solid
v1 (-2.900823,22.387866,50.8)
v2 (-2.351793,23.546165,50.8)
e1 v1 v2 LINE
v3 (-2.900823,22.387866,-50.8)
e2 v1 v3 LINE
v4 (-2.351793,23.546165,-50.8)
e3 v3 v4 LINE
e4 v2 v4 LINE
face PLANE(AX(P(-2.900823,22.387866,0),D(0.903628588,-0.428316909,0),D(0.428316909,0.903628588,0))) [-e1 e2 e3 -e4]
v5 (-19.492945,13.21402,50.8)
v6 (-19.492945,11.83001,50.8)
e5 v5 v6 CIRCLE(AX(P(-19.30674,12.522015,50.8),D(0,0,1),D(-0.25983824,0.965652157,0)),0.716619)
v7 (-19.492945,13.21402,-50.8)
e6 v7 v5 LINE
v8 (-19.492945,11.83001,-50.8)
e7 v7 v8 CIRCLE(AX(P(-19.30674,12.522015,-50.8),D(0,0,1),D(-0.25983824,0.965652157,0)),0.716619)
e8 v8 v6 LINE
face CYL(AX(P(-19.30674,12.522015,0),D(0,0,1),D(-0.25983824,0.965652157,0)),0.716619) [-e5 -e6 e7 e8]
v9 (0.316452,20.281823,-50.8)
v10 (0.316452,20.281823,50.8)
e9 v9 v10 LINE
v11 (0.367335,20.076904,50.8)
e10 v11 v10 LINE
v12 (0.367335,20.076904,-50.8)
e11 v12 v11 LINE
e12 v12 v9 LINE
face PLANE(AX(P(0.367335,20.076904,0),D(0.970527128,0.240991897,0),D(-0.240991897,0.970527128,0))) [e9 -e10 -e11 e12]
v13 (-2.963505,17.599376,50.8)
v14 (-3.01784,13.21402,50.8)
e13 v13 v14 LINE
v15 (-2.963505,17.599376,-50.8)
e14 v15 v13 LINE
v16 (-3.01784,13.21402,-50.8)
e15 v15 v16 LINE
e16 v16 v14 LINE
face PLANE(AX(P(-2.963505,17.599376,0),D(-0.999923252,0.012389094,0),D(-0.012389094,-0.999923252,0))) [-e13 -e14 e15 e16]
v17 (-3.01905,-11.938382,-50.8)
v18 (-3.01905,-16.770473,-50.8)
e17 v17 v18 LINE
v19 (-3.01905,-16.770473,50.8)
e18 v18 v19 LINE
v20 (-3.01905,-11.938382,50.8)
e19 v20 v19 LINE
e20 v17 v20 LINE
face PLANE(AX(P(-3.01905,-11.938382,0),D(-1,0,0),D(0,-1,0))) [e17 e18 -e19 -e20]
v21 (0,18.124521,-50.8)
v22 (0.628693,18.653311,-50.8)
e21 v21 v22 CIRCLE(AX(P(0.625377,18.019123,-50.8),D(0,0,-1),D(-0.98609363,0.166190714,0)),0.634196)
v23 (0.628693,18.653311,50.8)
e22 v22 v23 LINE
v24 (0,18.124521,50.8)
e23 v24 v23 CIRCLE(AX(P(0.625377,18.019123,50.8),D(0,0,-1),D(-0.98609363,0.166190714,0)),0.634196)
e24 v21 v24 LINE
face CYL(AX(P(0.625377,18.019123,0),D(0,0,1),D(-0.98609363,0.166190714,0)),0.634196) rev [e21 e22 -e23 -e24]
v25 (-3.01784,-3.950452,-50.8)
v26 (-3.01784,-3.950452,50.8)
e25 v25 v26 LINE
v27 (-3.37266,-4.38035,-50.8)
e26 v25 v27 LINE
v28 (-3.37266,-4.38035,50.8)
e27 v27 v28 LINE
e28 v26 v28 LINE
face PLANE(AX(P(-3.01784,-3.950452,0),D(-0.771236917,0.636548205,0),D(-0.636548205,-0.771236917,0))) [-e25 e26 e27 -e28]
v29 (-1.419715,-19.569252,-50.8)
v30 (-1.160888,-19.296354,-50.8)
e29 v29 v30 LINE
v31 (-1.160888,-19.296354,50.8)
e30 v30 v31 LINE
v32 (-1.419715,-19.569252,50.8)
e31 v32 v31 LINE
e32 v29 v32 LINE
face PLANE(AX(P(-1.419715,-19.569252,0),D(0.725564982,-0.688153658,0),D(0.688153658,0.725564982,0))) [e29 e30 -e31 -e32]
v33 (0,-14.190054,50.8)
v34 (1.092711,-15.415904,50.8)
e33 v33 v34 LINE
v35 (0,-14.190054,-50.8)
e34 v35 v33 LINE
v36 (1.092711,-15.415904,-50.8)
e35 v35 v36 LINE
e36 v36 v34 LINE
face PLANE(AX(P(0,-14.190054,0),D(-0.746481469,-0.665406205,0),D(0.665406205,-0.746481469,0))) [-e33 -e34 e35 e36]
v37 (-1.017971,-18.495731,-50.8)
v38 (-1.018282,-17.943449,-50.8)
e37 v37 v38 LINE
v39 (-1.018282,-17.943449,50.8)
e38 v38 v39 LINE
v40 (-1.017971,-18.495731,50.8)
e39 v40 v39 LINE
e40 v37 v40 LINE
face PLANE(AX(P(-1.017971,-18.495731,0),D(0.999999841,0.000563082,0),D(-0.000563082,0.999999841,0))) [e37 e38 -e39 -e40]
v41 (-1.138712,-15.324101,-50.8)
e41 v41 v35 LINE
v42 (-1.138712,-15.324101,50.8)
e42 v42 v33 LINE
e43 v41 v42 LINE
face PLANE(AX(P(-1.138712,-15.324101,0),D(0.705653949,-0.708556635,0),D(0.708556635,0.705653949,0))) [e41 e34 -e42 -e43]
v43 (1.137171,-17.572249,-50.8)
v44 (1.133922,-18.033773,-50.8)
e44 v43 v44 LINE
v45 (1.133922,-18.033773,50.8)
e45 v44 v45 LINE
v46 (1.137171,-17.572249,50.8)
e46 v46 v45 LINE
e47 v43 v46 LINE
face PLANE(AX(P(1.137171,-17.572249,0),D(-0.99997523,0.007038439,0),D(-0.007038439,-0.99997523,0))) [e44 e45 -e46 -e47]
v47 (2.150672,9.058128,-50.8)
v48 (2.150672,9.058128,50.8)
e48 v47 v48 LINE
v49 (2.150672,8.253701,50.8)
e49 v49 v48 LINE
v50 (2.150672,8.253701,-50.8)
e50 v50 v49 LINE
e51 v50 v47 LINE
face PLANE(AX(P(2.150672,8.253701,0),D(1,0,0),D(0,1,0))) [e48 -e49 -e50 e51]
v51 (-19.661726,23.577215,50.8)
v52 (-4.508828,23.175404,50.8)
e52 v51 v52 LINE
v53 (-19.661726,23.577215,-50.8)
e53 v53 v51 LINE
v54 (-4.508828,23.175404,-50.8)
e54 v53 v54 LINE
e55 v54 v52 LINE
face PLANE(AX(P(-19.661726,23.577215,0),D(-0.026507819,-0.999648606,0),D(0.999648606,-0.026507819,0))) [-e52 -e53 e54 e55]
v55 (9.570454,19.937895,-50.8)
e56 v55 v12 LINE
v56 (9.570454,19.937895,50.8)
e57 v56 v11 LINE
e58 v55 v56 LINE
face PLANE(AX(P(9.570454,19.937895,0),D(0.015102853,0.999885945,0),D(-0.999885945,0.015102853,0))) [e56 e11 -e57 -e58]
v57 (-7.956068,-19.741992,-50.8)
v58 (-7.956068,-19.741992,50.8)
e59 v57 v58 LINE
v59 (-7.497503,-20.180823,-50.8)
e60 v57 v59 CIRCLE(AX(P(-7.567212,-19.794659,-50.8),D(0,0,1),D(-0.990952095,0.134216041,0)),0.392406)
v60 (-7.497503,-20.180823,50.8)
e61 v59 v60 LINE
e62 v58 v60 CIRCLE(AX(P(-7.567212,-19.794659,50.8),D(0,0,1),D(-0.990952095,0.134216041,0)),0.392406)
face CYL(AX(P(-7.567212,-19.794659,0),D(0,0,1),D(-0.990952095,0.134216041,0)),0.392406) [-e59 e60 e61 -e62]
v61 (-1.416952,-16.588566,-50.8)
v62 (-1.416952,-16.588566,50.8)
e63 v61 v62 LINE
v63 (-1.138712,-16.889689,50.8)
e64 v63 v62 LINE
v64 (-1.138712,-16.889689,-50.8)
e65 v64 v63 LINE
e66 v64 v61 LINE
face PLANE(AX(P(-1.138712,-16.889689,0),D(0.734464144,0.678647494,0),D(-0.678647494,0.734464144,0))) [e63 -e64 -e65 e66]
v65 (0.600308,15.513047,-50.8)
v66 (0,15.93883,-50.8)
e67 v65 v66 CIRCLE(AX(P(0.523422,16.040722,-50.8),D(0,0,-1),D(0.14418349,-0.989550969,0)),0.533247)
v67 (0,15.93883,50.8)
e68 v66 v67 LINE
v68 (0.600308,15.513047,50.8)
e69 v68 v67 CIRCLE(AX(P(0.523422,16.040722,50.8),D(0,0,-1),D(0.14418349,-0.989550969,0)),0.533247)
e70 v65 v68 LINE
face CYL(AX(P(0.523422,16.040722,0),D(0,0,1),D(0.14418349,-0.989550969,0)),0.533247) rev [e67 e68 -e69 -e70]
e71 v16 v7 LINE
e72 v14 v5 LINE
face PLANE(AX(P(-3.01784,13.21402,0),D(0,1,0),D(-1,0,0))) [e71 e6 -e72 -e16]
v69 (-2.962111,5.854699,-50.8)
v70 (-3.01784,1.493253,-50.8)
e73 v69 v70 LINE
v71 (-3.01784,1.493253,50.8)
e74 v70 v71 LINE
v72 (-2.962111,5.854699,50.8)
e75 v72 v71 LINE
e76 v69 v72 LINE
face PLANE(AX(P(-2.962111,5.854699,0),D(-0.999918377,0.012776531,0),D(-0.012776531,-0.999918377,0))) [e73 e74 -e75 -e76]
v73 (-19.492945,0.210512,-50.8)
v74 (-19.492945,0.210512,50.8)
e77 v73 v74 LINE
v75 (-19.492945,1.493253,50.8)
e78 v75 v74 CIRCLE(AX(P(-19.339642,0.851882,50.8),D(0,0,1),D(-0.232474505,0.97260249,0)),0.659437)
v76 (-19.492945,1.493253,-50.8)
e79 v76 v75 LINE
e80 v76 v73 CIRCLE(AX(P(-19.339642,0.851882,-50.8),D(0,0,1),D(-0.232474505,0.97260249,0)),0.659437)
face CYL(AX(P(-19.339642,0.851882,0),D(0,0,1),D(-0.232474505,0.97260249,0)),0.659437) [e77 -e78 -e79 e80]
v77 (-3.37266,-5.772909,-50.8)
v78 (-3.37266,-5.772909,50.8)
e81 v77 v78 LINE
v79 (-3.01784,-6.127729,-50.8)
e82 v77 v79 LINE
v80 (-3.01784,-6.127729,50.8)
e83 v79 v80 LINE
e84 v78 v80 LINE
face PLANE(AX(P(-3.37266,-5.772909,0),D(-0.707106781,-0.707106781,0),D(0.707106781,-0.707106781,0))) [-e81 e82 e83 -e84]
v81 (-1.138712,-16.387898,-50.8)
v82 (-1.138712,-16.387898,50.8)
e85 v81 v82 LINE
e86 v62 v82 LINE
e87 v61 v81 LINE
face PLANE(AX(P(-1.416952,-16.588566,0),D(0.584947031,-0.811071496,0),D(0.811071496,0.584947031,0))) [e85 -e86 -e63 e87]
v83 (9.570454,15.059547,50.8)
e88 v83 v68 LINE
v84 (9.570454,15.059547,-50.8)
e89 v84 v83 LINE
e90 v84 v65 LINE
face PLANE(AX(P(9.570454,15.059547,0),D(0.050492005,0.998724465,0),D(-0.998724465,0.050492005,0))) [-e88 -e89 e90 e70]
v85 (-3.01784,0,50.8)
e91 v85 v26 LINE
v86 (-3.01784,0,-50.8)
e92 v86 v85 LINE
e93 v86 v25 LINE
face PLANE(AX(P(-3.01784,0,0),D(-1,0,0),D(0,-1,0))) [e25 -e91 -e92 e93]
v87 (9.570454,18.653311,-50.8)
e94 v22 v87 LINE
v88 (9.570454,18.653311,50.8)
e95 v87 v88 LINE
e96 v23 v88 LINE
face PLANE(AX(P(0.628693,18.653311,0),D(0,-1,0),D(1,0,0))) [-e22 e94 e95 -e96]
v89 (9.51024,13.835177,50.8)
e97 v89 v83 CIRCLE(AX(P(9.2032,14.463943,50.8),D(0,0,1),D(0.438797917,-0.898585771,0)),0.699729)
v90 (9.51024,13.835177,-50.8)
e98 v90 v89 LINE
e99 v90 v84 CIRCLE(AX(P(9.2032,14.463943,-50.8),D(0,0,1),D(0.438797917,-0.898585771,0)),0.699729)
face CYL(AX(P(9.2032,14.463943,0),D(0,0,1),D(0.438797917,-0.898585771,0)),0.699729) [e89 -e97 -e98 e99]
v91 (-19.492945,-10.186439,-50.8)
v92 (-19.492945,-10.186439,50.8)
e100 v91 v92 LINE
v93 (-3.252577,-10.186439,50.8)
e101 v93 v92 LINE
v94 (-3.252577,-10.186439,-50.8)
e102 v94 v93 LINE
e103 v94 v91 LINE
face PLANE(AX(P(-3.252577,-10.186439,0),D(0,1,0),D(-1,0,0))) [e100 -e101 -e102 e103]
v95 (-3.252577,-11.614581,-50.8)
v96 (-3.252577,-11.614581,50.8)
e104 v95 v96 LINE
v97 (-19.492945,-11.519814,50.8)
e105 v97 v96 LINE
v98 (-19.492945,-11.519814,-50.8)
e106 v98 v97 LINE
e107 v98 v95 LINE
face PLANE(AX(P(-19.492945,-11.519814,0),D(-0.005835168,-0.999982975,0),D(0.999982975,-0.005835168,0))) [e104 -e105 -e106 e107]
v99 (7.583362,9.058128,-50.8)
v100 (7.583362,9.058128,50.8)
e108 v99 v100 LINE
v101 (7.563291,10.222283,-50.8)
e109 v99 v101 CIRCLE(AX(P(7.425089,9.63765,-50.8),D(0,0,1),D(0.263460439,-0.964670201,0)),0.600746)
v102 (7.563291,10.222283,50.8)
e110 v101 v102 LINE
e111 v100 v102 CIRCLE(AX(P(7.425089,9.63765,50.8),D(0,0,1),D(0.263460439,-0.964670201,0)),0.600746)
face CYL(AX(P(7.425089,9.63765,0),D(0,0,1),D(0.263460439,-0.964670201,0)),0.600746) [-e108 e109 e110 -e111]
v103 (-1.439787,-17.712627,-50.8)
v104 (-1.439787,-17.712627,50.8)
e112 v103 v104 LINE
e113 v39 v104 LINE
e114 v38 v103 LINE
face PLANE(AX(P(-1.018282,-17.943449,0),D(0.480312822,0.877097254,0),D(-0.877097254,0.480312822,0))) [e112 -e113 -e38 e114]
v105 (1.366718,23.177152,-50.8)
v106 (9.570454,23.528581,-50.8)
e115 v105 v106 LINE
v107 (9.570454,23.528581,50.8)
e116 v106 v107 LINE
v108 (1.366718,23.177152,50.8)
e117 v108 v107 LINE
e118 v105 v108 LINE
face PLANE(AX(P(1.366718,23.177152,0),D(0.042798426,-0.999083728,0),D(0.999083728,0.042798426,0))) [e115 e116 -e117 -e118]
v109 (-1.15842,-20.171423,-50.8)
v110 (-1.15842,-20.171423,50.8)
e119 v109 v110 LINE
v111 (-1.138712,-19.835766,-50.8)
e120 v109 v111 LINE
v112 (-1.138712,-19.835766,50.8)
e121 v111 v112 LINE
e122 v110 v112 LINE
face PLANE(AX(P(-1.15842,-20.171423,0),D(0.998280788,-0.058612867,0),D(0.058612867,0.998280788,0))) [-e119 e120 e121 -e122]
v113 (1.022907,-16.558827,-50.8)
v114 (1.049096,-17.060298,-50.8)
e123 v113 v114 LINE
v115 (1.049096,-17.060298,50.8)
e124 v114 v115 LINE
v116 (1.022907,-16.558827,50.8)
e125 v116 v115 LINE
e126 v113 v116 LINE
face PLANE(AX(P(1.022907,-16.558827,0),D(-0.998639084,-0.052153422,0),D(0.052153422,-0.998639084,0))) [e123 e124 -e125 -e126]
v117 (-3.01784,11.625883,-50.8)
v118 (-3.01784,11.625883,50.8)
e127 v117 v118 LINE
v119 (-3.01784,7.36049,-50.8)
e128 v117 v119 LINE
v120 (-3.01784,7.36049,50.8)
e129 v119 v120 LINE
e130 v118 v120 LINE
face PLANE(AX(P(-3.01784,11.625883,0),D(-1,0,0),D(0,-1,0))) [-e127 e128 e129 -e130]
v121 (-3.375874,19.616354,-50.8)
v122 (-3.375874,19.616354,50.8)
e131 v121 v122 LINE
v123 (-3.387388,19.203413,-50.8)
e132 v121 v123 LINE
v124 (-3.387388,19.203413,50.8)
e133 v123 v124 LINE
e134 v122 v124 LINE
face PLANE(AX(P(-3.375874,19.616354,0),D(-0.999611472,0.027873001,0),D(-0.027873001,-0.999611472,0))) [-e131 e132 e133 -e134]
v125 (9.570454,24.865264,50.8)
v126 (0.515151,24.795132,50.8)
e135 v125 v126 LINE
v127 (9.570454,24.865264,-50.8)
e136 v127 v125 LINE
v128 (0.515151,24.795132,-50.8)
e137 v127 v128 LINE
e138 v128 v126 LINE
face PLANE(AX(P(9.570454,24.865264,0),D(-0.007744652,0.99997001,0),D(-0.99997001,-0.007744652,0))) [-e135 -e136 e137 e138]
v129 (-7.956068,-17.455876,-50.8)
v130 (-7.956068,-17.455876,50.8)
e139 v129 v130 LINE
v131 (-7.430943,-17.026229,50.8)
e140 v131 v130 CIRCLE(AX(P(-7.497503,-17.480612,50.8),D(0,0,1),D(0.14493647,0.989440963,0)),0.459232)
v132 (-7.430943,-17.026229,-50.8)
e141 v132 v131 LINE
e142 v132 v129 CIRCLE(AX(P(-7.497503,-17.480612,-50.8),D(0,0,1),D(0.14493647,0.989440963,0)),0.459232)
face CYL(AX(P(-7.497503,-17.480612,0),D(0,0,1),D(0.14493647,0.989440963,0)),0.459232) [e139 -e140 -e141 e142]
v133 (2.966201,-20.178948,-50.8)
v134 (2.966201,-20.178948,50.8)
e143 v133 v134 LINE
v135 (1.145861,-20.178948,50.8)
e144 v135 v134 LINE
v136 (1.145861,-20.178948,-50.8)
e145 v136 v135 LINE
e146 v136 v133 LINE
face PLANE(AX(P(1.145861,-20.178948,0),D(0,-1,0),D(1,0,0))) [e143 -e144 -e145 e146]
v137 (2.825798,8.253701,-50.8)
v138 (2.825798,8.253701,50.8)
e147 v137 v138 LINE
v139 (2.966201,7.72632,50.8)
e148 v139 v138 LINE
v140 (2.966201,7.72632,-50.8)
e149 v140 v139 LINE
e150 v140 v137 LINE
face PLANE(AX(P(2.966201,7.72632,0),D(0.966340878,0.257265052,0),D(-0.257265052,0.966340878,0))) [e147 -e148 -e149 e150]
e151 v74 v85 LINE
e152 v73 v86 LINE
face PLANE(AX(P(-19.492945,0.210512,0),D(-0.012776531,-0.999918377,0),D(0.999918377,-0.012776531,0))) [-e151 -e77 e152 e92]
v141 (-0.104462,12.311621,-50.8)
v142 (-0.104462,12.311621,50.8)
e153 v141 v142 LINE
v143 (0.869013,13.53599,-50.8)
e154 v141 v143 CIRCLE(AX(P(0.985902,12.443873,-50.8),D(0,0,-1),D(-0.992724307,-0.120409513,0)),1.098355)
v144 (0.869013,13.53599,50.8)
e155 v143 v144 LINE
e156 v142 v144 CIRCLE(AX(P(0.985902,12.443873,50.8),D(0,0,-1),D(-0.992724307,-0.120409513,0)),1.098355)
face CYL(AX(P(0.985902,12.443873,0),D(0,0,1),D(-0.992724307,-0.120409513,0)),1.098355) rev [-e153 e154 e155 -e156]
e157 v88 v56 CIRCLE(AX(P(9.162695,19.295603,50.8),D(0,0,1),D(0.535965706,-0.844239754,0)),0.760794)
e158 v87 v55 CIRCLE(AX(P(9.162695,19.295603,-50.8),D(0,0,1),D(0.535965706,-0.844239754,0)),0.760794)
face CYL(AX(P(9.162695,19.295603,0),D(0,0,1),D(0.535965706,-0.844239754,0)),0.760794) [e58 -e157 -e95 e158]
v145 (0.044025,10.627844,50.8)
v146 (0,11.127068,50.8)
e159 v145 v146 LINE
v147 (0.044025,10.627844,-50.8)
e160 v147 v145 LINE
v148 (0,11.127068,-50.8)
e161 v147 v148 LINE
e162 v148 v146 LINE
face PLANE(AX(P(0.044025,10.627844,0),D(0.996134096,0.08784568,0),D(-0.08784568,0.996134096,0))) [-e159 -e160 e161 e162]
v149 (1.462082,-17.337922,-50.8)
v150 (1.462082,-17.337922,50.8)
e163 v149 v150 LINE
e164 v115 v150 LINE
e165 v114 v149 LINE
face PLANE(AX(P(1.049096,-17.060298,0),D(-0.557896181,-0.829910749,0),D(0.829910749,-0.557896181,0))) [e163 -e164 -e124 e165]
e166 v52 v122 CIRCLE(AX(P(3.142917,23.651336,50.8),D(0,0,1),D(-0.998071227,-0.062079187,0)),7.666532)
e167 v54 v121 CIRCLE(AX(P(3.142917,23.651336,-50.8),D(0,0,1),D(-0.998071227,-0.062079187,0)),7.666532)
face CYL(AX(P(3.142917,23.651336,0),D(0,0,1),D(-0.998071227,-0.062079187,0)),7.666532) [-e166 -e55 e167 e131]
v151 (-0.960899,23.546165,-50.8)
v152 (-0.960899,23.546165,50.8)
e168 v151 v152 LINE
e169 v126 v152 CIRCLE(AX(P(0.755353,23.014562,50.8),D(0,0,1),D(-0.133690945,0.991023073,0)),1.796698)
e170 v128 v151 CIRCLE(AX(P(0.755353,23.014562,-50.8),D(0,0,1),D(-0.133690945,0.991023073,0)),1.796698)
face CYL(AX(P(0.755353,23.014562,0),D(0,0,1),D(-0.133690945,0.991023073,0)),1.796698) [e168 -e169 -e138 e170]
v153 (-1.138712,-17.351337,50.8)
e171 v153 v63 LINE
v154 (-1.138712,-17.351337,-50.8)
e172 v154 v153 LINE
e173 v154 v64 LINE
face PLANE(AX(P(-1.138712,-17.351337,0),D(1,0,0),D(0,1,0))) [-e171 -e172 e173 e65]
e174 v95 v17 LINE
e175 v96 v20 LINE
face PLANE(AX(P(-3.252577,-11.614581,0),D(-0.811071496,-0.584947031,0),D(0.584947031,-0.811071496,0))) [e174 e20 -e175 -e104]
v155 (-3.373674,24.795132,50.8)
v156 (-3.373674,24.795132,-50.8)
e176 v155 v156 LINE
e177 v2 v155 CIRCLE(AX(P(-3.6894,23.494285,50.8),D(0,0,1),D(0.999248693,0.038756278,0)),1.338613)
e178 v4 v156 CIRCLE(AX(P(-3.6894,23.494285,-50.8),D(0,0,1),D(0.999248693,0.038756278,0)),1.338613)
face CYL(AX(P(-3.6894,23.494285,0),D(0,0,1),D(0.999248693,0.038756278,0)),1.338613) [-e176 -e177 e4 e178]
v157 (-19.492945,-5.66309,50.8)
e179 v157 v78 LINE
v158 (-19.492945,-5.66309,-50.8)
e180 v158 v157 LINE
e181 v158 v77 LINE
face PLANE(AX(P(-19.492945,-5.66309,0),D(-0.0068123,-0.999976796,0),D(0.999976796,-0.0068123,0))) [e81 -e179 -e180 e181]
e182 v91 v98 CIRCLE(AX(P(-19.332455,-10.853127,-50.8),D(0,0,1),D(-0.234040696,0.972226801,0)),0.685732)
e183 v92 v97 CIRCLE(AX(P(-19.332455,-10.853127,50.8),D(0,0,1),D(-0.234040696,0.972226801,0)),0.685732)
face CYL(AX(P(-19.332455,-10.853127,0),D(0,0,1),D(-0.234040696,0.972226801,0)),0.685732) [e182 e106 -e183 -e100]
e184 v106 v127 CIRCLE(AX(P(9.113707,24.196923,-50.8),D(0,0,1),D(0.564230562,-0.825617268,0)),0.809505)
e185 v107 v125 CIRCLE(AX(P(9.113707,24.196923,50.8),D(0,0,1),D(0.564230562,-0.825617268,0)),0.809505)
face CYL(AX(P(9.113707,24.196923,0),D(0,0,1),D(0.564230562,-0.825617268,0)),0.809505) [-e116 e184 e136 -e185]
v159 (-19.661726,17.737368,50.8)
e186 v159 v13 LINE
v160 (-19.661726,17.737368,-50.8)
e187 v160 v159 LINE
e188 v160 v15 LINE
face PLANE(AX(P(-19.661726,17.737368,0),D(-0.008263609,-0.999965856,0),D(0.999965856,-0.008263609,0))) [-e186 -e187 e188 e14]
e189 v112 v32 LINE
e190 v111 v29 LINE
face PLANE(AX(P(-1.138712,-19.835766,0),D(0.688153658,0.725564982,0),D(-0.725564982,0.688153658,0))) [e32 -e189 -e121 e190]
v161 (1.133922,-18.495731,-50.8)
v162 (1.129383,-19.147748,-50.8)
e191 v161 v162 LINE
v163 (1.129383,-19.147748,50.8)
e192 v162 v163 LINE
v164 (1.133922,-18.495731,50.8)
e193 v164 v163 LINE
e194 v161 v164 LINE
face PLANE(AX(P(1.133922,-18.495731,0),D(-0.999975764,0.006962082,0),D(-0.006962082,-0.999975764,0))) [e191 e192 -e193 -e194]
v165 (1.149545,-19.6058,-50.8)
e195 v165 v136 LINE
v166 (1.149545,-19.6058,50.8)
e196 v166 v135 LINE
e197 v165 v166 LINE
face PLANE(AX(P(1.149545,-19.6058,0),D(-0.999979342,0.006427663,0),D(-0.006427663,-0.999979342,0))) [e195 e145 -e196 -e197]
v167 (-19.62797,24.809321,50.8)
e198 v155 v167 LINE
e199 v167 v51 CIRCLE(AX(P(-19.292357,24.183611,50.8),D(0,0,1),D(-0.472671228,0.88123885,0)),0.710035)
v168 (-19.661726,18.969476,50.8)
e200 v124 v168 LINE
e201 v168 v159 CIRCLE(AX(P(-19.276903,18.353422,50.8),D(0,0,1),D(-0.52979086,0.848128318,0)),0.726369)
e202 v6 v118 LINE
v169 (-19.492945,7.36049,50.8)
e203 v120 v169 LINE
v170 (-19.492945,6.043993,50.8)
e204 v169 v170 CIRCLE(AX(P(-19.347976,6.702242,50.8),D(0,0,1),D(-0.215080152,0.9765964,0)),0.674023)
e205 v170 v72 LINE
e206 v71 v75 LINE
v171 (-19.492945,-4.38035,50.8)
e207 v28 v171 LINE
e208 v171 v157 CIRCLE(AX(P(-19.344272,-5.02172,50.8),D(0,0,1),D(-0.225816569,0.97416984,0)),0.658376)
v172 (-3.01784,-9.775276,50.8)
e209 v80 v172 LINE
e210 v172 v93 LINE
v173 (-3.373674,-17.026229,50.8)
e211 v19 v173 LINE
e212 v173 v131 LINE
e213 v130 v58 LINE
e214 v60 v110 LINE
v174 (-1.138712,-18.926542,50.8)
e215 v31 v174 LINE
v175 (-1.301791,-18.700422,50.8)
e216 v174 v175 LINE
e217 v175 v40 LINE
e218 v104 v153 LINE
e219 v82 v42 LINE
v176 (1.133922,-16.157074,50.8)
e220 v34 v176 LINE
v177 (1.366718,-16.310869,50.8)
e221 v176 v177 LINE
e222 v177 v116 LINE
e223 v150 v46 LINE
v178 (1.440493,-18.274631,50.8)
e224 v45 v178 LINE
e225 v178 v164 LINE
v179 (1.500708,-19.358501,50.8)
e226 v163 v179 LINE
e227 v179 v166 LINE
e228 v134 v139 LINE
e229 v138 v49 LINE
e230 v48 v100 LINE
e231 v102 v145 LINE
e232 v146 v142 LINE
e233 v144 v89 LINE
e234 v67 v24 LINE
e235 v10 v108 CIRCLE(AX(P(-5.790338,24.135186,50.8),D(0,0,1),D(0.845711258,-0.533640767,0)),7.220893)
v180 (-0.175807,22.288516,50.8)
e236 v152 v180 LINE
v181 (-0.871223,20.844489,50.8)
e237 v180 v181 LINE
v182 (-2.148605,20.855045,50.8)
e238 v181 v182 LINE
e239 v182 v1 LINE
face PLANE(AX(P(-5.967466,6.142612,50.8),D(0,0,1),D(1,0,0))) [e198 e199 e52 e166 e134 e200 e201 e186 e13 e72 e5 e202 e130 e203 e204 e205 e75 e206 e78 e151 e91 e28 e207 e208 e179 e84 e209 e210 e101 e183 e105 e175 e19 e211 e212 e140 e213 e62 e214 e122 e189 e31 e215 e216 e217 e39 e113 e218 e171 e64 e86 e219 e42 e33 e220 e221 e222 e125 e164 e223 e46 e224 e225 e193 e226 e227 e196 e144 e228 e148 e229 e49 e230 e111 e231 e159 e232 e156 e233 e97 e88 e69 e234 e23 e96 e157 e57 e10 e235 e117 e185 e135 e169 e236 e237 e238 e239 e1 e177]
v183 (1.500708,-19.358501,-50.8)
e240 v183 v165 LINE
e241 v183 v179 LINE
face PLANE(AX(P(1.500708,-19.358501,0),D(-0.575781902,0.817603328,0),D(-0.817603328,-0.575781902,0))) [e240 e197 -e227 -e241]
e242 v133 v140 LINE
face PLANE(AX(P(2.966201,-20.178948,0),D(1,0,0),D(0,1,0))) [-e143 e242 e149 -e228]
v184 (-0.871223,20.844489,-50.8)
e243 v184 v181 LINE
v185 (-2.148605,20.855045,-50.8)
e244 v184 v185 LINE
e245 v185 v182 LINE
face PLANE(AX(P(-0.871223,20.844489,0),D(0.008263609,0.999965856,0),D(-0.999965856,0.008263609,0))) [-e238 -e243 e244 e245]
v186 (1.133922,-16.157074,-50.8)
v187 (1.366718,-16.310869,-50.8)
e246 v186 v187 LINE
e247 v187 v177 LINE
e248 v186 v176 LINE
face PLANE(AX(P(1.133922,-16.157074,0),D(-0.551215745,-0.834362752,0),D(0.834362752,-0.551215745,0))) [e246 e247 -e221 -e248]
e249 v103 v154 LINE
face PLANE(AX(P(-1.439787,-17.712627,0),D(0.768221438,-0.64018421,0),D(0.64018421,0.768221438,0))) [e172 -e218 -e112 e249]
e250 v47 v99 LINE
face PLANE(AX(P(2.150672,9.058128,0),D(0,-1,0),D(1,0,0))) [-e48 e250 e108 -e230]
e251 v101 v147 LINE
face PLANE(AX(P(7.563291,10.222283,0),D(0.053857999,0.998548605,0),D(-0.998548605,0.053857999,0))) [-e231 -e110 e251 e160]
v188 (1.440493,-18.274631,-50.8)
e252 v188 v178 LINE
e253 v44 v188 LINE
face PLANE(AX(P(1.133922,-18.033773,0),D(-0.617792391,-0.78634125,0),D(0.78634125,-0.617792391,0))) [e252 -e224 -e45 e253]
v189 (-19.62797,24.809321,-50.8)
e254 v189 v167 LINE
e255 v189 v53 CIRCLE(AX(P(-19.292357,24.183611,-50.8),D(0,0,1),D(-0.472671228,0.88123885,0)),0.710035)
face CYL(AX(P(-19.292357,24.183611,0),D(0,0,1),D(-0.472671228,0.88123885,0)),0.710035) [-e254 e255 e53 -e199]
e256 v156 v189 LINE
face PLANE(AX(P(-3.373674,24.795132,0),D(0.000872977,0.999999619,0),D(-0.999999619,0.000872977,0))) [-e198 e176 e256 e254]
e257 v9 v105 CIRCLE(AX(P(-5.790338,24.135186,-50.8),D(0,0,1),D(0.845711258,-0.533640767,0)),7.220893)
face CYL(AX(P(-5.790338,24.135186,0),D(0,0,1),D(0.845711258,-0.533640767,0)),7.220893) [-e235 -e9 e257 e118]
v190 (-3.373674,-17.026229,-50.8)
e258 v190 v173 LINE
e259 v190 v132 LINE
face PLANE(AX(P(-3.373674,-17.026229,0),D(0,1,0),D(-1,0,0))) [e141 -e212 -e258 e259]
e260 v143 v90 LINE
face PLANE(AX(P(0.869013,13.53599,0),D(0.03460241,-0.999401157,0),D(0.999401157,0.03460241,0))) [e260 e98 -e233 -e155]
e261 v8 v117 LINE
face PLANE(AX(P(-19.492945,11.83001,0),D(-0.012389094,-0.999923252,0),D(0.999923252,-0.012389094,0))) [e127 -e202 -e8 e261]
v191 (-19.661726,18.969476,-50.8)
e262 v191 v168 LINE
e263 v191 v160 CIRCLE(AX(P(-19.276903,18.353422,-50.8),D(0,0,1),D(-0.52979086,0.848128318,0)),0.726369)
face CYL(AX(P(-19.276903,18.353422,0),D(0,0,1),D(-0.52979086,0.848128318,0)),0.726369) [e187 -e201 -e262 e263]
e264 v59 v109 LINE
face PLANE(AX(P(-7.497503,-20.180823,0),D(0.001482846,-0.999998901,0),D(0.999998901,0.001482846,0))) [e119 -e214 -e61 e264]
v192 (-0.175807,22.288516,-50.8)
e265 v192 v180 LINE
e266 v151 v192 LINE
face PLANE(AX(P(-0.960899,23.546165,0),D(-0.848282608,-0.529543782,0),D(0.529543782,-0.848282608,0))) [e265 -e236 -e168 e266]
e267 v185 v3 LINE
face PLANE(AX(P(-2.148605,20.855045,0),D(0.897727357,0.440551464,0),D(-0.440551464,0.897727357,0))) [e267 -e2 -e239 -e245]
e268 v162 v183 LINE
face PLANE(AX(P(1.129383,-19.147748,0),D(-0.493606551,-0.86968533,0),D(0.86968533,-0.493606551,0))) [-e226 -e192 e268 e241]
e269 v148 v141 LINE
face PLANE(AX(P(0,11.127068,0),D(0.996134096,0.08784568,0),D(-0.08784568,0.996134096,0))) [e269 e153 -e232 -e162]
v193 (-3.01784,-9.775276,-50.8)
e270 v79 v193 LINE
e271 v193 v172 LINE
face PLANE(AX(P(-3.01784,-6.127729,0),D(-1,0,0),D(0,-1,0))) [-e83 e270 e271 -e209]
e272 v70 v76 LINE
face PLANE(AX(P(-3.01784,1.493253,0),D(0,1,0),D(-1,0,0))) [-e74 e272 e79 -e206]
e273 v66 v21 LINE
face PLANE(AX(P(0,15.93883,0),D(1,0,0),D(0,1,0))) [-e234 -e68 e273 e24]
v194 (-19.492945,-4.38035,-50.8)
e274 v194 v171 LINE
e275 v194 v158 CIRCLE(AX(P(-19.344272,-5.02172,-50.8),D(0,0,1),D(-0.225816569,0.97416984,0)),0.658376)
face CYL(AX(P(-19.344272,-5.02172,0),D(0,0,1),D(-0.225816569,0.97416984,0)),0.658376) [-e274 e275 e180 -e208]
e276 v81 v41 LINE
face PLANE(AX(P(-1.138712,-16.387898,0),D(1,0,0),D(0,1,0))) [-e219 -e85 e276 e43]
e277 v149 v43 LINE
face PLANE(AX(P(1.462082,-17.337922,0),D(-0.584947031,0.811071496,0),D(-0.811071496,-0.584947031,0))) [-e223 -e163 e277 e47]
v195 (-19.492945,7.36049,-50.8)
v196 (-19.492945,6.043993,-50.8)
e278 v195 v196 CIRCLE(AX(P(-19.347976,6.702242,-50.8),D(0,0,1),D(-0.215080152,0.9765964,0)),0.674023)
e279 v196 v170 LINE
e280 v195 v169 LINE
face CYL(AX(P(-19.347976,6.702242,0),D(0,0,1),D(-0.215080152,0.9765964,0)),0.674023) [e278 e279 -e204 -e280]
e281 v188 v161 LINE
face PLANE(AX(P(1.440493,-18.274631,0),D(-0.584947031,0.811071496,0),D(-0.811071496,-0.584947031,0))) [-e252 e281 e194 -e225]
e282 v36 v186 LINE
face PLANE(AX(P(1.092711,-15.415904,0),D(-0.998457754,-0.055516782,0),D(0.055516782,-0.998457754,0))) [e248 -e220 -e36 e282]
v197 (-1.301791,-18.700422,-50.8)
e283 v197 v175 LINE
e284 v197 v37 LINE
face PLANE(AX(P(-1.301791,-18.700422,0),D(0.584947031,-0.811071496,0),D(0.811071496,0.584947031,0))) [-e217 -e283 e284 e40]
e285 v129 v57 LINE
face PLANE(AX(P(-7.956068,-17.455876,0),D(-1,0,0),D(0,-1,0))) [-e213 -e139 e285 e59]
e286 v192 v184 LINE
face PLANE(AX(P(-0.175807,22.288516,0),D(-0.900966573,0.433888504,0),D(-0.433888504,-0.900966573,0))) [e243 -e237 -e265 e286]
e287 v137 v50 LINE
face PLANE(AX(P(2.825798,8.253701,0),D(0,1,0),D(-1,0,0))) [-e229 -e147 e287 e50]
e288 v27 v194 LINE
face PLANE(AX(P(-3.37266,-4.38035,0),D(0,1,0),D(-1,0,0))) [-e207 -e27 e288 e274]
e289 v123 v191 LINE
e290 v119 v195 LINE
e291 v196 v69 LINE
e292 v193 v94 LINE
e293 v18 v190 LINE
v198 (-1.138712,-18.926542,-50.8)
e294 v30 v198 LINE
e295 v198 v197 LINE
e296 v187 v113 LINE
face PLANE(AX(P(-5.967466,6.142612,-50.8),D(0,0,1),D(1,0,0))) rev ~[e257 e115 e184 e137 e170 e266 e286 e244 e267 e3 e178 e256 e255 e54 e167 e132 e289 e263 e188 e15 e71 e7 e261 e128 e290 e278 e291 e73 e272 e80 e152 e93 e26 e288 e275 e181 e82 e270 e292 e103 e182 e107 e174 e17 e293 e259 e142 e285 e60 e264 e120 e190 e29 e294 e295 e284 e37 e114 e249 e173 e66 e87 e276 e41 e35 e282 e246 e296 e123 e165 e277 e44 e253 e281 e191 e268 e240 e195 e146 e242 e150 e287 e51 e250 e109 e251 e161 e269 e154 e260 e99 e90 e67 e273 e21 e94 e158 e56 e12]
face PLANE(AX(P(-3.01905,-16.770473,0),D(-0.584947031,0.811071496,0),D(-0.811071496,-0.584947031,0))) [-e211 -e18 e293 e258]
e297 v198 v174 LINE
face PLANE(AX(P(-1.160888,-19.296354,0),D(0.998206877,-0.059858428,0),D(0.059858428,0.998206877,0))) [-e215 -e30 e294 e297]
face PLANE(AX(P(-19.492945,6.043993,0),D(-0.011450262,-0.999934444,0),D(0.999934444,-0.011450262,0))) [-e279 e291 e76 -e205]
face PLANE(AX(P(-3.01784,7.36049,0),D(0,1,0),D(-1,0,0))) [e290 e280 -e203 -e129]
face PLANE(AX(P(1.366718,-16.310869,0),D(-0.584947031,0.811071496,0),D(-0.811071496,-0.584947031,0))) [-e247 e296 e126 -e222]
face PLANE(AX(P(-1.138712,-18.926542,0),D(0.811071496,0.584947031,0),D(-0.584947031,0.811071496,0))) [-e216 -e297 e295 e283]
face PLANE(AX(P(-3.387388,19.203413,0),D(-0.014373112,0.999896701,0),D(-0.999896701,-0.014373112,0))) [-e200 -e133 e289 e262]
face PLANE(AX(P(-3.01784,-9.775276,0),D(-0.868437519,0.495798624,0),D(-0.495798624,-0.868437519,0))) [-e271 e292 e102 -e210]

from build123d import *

# Parameters (mm, degrees)
F1_DEPTH      = 50.8
F1_DEPTH_BACK = 50.8


# Not quite as in the source:
# - a feature of the source that left no trace in its solid (it failed there, or was rolled back) is left out
# - the program builds the solid bodies; features that only make, move or delete a surface that nothing else refers to are left out


with BuildPart() as f1:
    # F0 (on Top) → F1 (new body, two sides)
    with BuildSketch(Plane.XY) as f1_sk:
        with BuildLine():
            Line((-3.3736736514, 24.7951317579), (-19.627969712, 24.8093213886))
            ThreePointArc((-19.627969712, 24.8093213886), (-20.0021253233, 24.2030567982), (-19.6617264301, 23.57721515))
            Line((-19.6617264301, 23.57721515), (-4.5088279332, 23.1754036615))
            ThreePointArc((-4.5088279332, 23.1754036615), (-4.1624050394, 21.325828975), (-3.3758739325, 19.6163541549))
            Line((-3.3758739325, 19.6163541549), (-3.3873883076, 19.2034132779))
            Line((-3.3873883076, 19.2034132779), (-19.6617264301, 18.969476223))
            ThreePointArc((-19.6617264301, 18.969476223), (-20.0032717352, 18.3534221724), (-19.6617264301, 17.7373681217))
            Line((-19.6617264301, 17.7373681217), (-2.9635052222, 17.5993758319))
            Line((-2.9635052222, 17.5993758319), (-3.0178399757, 13.2140200585))
            Line((-3.0178399757, 13.2140200585), (-19.4929447025, 13.2140200585))
            ThreePointArc((-19.4929447025, 13.2140200585), (-20.0233587748, 12.5220152549), (-19.4929447025, 11.8300104514))
            Line((-19.4929447025, 11.8300104514), (-3.0178399757, 11.6258831695))
            Line((-3.0178399757, 11.6258831695), (-3.0178399757, 7.360490039))
            Line((-3.0178399757, 7.360490039), (-19.4929447025, 7.360490039))
            ThreePointArc((-19.4929447025, 7.360490039), (-20.0219986391, 6.7022417206), (-19.4929447025, 6.0439934023))
            Line((-19.4929447025, 6.0439934023), (-2.9621112743, 5.8546986264))
            Line((-2.9621112743, 5.8546986264), (-3.0178399757, 1.493252581))
            Line((-3.0178399757, 1.493252581), (-19.4929447025, 1.493252581))
            ThreePointArc((-19.4929447025, 1.493252581), (-19.999079636, 0.8518822287), (-19.4929447025, 0.2105118765))
            Line((-19.4929447025, 0.2105118765), (-3.0178399757, 0))
            Line((-3.0178399757, 0), (-3.0178399757, -3.950452432))
            Line((-3.0178399757, -3.950452432), (-3.3726599067, -4.3803495355))
            Line((-3.3726599067, -4.3803495355), (-19.4929447025, -4.3803495355))
            ThreePointArc((-19.4929447025, -4.3803495355), (-20.0026487971, -5.0217199605), (-19.4929447025, -5.6630903855))
            Line((-19.4929447025, -5.6630903855), (-3.3726599067, -5.7729091495))
            Line((-3.3726599067, -5.7729091495), (-3.0178399757, -6.1277290806))
            Line((-3.0178399757, -6.1277290806), (-3.0178399757, -9.7752762958))
            Line((-3.0178399757, -9.7752762958), (-3.2525765998, -10.18643938))
            Line((-3.2525765998, -10.18643938), (-19.4929447025, -10.18643938))
            ThreePointArc((-19.4929447025, -10.18643938), (-20.0181876942, -10.8531266451), (-19.4929447025, -11.5198139101))
            Line((-19.4929447025, -11.5198139101), (-3.2525765998, -11.6145808049))
            Line((-3.2525765998, -11.6145808049), (-3.0190503156, -11.9383819401))
            Line((-3.0190503156, -11.9383819401), (-3.0190503156, -16.7704734888))
            Line((-3.0190503156, -16.7704734888), (-3.3736736514, -17.0262288302))
            Line((-3.3736736514, -17.0262288302), (-7.4309431948, -17.0262288302))
            ThreePointArc((-7.4309431948, -17.0262288302), (-7.7883055211, -17.1251856492), (-7.9560680315, -17.4558758736))
            Line((-7.9560680315, -17.4558758736), (-7.9560680315, -19.7419915348))
            ThreePointArc((-7.9560680315, -19.7419915348), (-7.8385182356, -20.0781647595), (-7.497502665, -20.1808232814))
            Line((-7.497502665, -20.1808232814), (-1.1584198955, -20.1714233881))
            Line((-1.1584198955, -20.1714233881), (-1.138712159, -19.8357657809))
            Line((-1.138712159, -19.8357657809), (-1.4197152341, -19.5692516863))
            Line((-1.4197152341, -19.5692516863), (-1.160888255, -19.2963536351))
            Line((-1.160888255, -19.2963536351), (-1.138712159, -18.9265421938))
            Line((-1.138712159, -18.9265421938), (-1.3017905422, -18.7004221842))
            Line((-1.3017905422, -18.7004221842), (-1.0179714863, -18.4957310875))
            Line((-1.0179714863, -18.4957310875), (-1.018282466, -17.9434493202))
            Line((-1.018282466, -17.9434493202), (-1.4397868638, -17.7126266085))
            Line((-1.4397868638, -17.7126266085), (-1.138712159, -17.3513367812))
            Line((-1.138712159, -17.3513367812), (-1.138712159, -16.8896894959))
            Line((-1.138712159, -16.8896894959), (-1.4169517005, -16.588565616))
            Line((-1.4169517005, -16.588565616), (-1.138712159, -16.3878984806))
            Line((-1.138712159, -16.3878984806), (-1.138712159, -15.3241008577))
            Line((-1.138712159, -15.3241008577), (0, -14.1900535673))
            Line((0, -14.1900535673), (1.0927112374, -15.4159043089))
            Line((1.0927112374, -15.4159043089), (1.1339221451, -16.1570739001))
            Line((1.1339221451, -16.1570739001), (1.3667184391, -16.3108690956))
            Line((1.3667184391, -16.3108690956), (1.0229069001, -16.558826939))
            Line((1.0229069001, -16.558826939), (1.0490959976, -17.0602984726))
            Line((1.0490959976, -17.0602984726), (1.462081531, -17.337922364))
            Line((1.462081531, -17.337922364), (1.1371706318, -17.572249013))
            Line((1.1371706318, -17.572249013), (1.1339221451, -18.033772707))
            Line((1.1339221451, -18.033772707), (1.4404929399, -18.274631373))
            Line((1.4404929399, -18.274631373), (1.1339221451, -18.4957310875))
            Line((1.1339221451, -18.4957310875), (1.1293826392, -19.1477481276))
            Line((1.1293826392, -19.1477481276), (1.5007078182, -19.3585008383))
            Line((1.5007078182, -19.3585008383), (1.1495453005, -19.6058004949))
            Line((1.1495453005, -19.6058004949), (1.1458612277, -20.178947635))
            Line((1.1458612277, -20.178947635), (2.9662006887, -20.178947635))
            Line((2.9662006887, -20.178947635), (2.9662006887, 7.7263202994))
            Line((2.9662006887, 7.7263202994), (2.825798234, 8.2537010312))
            Line((2.825798234, 8.2537010312), (2.1506715566, 8.2537010312))
            Line((2.1506715566, 8.2537010312), (2.1506715566, 9.0581281111))
            Line((2.1506715566, 9.0581281111), (7.5833620504, 9.0581281111))
            ThreePointArc((7.5833620504, 9.0581281111), (8.0257459726, 9.6480058962), (7.5632906519, 10.222283192))
            Line((7.5632906519, 10.222283192), (0.0440248574, 10.6278444304))
            Line((0.0440248574, 10.6278444304), (0, 11.1270683113))
            Line((0, 11.1270683113), (-0.1044616438, 12.3116206378))
            ThreePointArc((-0.1044616438, 12.3116206378), (0.126172228, 13.1274286151), (0.8690126706, 13.5359903798))
            Line((0.8690126706, 13.5359903798), (9.5102395862, 13.8351768255))
            ThreePointArc((9.5102395862, 13.8351768255), (9.9020840969, 14.4295718757), (9.570454247, 15.0595474616))
            Line((9.570454247, 15.0595474616), (0.6003075975, 15.5130466074))
            ThreePointArc((0.6003075975, 15.5130466074), (0.2149232739, 15.60577238), (0, 15.9388296306))
            Line((0, 15.9388296306), (0, 18.1245207787))
            ThreePointArc((0, 18.1245207787), (0.2171557282, 18.5044688755), (0.6286933785, 18.6533108354))
            Line((0.6286933785, 18.6533108354), (9.570454247, 18.6533108354))
            ThreePointArc((9.570454247, 18.6533108354), (9.9234885577, 19.2956030182), (9.570454247, 19.9378952011))
            Line((9.570454247, 19.9378952011), (0.3673353055, 20.0769044086))
            Line((0.3673353055, 20.0769044086), (0.3164518273, 20.2818233147))
            ThreePointArc((0.3164518273, 20.2818233147), (0.9977498793, 21.6728398839), (1.3667184391, 23.1771524623))
            Line((1.3667184391, 23.1771524623), (9.570454247, 23.5285814479))
            ThreePointArc((9.570454247, 23.5285814479), (9.9232117791, 24.1969227418), (9.570454247, 24.8652640357))
            Line((9.570454247, 24.8652640357), (0.5151510704, 24.7951317579))
            ThreePointArc((0.5151510704, 24.7951317579), (-0.4052105617, 24.3861366082), (-0.9608993423, 23.5461648554))
            Line((-0.9608993423, 23.5461648554), (-0.1758071594, 22.2885161638))
            Line((-0.1758071594, 22.2885161638), (-0.8712234916, 20.8444888061))
            Line((-0.8712234916, 20.8444888061), (-2.148604719, 20.8550449461))
            Line((-2.148604719, 20.8550449461), (-2.9008225538, 22.3878659308))
            Line((-2.9008225538, 22.3878659308), (-2.3517927621, 23.5461648554))
            ThreePointArc((-2.3517927621, 23.5461648554), (-2.6533703145, 24.3419450304), (-3.3736736514, 24.7951317579))
        make_face()
    extrude(amount=F1_DEPTH)
    extrude(f1_sk.sketch, amount=-F1_DEPTH_BACK)


solid = f1.part
